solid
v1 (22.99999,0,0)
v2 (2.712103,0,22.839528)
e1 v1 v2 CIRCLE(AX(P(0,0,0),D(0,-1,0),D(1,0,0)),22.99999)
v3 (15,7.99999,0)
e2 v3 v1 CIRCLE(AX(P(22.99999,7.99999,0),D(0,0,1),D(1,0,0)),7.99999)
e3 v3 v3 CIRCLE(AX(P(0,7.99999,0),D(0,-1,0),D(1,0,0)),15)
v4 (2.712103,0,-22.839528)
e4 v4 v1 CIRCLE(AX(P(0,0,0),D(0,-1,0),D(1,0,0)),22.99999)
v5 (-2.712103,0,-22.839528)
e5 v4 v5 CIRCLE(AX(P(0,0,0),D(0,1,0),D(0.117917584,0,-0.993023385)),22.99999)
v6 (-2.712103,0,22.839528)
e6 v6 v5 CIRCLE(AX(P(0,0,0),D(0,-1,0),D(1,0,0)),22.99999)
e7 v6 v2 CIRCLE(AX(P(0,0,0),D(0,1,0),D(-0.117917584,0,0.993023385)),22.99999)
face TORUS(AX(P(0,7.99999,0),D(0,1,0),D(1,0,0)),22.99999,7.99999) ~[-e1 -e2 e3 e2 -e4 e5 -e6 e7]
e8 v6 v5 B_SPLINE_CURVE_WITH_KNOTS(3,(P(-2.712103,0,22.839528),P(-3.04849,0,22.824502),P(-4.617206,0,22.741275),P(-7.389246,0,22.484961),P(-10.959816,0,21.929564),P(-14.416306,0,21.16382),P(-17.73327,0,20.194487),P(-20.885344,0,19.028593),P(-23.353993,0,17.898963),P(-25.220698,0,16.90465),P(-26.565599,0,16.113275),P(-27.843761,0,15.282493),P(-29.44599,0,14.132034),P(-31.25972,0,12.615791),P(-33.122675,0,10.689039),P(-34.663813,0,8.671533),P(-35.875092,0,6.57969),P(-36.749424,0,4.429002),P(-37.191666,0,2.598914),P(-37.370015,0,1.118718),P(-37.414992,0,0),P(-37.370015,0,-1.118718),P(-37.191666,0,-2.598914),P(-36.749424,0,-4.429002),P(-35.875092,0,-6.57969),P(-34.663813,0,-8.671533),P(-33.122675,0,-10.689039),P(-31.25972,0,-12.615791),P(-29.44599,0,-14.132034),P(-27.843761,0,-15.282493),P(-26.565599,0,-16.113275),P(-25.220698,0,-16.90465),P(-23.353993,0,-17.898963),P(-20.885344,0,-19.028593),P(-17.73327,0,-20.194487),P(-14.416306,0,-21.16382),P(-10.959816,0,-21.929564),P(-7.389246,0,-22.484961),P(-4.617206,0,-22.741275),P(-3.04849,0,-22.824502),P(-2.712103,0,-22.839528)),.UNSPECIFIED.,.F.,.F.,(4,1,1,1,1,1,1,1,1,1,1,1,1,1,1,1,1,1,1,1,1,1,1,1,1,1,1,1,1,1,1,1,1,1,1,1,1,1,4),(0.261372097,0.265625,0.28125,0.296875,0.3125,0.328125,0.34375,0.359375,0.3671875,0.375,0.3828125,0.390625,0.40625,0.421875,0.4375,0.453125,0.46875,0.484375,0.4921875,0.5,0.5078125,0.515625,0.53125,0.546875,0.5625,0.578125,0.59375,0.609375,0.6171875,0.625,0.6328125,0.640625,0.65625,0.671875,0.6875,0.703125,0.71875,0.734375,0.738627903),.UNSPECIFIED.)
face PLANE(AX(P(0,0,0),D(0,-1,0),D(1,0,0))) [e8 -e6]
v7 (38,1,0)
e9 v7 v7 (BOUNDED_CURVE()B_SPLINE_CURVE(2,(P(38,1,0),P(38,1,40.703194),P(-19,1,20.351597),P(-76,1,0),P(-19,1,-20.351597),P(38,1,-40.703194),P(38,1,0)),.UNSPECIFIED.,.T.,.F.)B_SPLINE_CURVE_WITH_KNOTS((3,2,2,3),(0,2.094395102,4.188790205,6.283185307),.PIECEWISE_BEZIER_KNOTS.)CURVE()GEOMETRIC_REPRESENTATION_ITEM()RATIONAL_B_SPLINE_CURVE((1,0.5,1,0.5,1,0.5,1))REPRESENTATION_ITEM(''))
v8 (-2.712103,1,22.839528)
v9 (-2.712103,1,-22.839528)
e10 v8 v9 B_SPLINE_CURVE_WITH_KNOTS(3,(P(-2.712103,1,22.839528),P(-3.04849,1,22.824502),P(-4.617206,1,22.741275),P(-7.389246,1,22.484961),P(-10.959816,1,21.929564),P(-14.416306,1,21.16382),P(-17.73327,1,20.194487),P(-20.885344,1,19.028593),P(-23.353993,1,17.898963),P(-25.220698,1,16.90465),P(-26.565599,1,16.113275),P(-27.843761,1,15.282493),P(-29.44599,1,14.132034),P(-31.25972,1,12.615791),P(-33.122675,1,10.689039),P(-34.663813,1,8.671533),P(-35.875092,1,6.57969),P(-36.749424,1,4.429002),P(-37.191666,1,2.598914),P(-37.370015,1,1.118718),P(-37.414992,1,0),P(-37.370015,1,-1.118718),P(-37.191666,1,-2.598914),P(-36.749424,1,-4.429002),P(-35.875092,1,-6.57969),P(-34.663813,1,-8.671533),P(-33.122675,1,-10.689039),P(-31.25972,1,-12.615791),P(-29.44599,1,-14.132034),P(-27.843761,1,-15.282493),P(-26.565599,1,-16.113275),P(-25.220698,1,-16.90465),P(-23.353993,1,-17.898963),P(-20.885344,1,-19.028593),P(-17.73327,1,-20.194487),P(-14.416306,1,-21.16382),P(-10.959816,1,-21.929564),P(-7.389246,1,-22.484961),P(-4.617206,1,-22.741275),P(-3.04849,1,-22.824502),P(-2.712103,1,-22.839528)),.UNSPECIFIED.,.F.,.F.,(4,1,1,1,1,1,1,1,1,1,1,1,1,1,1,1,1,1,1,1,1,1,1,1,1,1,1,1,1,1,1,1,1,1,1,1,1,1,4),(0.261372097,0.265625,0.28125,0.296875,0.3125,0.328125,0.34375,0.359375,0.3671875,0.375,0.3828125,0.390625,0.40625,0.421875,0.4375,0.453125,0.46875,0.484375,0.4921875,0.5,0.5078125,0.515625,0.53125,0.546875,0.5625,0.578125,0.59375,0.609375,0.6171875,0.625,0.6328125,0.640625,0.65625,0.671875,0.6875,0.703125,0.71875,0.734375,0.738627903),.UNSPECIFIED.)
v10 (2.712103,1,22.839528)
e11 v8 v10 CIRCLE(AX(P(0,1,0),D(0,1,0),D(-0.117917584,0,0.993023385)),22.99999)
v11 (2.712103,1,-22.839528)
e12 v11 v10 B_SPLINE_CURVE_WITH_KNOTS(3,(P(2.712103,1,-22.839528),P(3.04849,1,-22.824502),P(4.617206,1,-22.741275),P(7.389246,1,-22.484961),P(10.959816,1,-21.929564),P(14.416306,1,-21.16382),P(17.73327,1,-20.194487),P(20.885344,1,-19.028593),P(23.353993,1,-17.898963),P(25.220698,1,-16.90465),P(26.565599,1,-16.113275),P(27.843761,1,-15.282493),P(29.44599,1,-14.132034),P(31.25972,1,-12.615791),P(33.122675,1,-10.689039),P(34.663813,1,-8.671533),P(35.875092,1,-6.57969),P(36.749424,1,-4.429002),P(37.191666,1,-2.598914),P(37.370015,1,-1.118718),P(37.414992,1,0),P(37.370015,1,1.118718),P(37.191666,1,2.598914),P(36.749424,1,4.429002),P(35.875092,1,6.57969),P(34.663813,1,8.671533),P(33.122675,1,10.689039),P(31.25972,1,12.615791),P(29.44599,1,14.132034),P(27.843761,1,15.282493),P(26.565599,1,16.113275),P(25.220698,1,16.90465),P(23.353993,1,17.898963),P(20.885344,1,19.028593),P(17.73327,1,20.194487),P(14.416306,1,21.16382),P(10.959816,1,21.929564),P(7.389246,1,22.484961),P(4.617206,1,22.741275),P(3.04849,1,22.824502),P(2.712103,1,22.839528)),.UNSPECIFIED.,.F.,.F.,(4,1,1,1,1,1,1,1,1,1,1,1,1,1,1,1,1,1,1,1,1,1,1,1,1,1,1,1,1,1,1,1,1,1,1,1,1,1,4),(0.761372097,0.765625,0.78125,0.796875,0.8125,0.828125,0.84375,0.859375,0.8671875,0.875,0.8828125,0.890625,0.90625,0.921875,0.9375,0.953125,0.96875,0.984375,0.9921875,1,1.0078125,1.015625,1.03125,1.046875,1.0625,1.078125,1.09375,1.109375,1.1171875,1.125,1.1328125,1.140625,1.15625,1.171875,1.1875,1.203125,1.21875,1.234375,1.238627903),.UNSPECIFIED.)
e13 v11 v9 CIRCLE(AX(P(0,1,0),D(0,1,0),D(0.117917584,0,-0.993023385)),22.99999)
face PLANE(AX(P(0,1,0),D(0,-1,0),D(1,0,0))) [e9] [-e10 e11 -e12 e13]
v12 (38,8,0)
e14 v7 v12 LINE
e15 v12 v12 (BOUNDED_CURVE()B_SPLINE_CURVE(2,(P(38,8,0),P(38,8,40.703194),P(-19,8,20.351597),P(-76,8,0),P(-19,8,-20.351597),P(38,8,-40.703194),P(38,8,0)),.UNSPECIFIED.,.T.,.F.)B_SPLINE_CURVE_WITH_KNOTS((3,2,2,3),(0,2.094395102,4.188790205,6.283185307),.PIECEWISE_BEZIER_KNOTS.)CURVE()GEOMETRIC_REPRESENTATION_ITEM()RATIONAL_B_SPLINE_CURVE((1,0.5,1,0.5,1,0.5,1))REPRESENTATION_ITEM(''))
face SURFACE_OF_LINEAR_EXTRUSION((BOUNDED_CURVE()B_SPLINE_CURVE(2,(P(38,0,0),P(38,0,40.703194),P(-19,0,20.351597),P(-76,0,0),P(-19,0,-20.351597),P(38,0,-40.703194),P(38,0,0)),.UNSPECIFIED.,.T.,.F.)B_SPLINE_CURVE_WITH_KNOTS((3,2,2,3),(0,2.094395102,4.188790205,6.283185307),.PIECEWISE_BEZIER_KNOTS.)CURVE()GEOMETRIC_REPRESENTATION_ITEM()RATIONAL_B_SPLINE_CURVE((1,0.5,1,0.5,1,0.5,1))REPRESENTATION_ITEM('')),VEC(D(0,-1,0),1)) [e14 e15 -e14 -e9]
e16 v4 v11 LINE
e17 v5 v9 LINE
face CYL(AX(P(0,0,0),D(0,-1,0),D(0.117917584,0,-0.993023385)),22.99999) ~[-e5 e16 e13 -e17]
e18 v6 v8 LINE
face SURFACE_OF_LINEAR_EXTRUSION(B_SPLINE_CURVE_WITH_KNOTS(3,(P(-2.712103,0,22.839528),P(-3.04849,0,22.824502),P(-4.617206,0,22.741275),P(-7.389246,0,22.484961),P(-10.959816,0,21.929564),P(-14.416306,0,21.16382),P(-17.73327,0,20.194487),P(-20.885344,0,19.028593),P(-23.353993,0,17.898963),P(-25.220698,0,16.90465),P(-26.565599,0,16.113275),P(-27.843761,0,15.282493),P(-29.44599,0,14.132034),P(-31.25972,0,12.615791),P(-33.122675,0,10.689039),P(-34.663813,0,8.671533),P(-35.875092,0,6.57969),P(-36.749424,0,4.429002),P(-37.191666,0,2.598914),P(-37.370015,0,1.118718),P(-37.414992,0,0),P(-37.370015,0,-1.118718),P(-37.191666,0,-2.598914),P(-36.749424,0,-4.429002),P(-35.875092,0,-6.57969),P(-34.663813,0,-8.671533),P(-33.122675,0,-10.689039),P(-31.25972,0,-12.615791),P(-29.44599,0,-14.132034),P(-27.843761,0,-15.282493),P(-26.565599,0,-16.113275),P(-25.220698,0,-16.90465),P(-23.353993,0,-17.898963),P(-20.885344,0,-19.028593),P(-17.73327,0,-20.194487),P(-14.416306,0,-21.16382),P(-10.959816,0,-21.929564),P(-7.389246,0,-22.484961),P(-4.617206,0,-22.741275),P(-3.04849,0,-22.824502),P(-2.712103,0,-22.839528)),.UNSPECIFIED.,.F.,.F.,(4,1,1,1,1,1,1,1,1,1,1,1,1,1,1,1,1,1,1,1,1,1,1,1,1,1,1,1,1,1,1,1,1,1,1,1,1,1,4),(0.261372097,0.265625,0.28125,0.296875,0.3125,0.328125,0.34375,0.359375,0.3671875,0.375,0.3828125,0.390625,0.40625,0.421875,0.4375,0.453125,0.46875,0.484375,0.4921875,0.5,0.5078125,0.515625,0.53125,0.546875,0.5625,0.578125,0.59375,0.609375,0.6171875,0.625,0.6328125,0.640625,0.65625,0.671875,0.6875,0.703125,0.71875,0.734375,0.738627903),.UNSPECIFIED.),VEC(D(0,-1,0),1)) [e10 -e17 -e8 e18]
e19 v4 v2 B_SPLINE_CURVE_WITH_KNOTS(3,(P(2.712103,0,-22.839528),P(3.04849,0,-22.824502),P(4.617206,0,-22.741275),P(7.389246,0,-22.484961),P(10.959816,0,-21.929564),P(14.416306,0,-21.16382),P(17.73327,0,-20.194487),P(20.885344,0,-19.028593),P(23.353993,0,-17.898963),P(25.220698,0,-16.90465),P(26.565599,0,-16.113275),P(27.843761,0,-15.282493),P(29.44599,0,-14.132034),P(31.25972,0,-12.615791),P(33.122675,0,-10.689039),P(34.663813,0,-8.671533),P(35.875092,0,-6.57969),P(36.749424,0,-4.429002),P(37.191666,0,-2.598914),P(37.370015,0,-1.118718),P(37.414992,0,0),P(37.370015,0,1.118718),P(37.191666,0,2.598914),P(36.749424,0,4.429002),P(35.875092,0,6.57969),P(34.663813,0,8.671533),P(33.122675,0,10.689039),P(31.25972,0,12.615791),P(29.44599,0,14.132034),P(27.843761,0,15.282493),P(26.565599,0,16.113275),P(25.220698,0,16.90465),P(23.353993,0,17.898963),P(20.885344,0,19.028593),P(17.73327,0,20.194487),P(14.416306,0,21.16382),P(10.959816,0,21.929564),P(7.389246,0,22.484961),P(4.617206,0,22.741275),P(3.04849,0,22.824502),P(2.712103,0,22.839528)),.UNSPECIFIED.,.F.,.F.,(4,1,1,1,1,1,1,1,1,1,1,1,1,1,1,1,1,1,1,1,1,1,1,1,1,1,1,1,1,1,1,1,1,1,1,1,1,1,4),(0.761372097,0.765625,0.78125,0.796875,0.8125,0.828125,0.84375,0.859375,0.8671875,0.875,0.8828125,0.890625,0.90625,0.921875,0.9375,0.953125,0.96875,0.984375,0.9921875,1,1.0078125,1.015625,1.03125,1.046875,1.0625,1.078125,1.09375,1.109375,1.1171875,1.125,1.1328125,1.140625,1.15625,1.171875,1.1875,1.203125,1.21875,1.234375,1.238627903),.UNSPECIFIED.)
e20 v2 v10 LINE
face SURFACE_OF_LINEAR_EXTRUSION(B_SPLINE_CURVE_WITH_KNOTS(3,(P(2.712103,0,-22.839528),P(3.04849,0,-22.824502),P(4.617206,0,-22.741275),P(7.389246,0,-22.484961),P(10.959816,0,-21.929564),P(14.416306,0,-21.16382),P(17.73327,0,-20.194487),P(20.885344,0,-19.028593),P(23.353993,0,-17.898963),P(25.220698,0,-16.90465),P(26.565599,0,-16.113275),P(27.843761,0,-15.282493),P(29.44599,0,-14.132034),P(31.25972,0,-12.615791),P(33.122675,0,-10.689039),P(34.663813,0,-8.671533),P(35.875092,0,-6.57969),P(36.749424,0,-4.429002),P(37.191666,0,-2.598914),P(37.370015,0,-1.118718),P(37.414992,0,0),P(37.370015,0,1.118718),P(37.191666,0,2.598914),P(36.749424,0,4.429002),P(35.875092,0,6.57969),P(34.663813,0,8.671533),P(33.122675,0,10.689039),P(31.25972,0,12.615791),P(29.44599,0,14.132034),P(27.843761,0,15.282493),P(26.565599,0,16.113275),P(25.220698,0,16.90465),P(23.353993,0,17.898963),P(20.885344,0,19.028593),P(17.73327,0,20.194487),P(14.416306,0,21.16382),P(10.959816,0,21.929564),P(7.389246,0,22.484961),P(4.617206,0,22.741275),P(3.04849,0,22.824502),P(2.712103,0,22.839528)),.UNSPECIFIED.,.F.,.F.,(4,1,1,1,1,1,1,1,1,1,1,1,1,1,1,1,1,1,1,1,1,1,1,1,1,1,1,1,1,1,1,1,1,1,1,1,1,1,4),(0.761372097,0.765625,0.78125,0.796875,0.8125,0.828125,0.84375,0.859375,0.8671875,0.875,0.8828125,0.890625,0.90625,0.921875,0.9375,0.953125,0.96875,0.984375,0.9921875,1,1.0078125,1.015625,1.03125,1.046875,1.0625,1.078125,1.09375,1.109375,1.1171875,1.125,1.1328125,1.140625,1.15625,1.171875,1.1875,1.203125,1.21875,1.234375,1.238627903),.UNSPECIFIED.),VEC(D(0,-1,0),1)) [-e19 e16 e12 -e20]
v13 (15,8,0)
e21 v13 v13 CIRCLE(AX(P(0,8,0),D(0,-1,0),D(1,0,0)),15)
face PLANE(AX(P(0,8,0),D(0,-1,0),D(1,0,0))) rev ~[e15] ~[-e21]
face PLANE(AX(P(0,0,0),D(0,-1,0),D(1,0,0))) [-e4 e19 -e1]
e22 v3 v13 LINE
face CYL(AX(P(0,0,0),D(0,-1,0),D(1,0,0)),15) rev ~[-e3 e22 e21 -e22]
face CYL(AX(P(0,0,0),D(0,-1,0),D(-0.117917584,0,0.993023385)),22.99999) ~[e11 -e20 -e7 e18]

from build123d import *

# Parameters (mm, degrees)
F0_R     = 15
F1_DEPTH = 8
F2_R     = 7.99999
F4_DEPTH = 1


# Not quite as in the source:
# - a fillet or chamfer is up to 0.001 mm smaller than in the source, because OpenCascade refuses the exact size
# - the dataset's text gives a spline's control points without its knots; the knots are read off the source's solid


with BuildPart() as f1:
    # F0 (on Front) → F1 (new body)
    with BuildSketch(Plane.XZ):
        with BuildLine():
            add(Edge.make_bspline(
                [(38, 0), (38, 40.7031939779), (-19, 20.3515969889), (-76, 0), (-19, -20.3515969889), (38, -40.7031939779), (38, 0)],
                knots=[0, 0, 0, 2.0943951024, 2.0943951024, 4.1887902048, 4.1887902048, 6.2831853072, 6.2831853072, 6.2831853072], degree=2, weights=[1, 0.5, 1, 0.5, 1, 0.5, 1]))
        make_face()
        Circle(F0_R, mode=Mode.SUBTRACT)
    extrude(amount=-F1_DEPTH)

    # F2 (radius 8 in the source; OpenCascade refuses exactly that, so slightly less here)
    f2_edges = [f1.edges().sort_by_distance(p)[0] for p in [
        (-15, 0, 0),
    ]]
    fillet(f2_edges, radius=F2_R)

    # F3 (on face) → F4 (cut)
    with BuildSketch(Plane.XZ):
        with BuildLine():
            add(Edge.make_bspline(
                [(38, 0), (38, 40.7031939779), (-19, 20.3515969889), (-76, 0), (-19, -20.3515969889), (38, -40.7031939779), (38, 0)],
                knots=[0, 0, 0, 2.0943951024, 2.0943951024, 4.1887902048, 4.1887902048, 6.2831853072, 6.2831853072, 6.2831853072], degree=2, weights=[1, 0.5, 1, 0.5, 1, 0.5, 1]))
        make_face()
        with BuildLine():
            add(Edge.make_bspline(
                [(37.4, 0), (37.4, 0.3729058543), (37.3700150225, 1.1187175629), (37.1916659495, 2.5989137585), (36.7494239841, 4.429002048), (35.8750924916, 6.5796899728), (34.6638131377, 8.6715326302), (33.1226752034, 10.6890391548), (31.2597201987, 12.6157908188), (29.4459901124, 14.1320344278), (27.8437614939, 15.2824930058), (26.5655992555, 16.1132749708), (25.2206981065, 16.9046504688), (23.3539925194, 17.898962984), (20.885344135, 19.0285928454), (17.7332695204, 20.1944866576), (14.4163055348, 21.1638203846), (10.9598159017, 21.9295641088), (7.38924551, 22.4849605857), (4.6172060854, 22.7412747637), (3.0484899282, 22.8245022324), (2.7121032493, 22.8395279278)],
                knots=[0, 0, 0, 0, 0.0078125, 0.015625, 0.03125, 0.046875, 0.0625, 0.078125, 0.09375, 0.109375, 0.1171875, 0.125, 0.1328125, 0.140625, 0.15625, 0.171875, 0.1875, 0.203125, 0.21875, 0.234375, 0.2386279027, 0.2386279027, 0.2386279027, 0.2386279027], degree=3))
            add(Edge.make_bspline(
                [(2.7121032493, -22.8395279278), (3.0484899282, -22.8245022324), (4.6172060854, -22.7412747637), (7.38924551, -22.4849605857), (10.9598159017, -21.9295641088), (14.4163055348, -21.1638203846), (17.7332695204, -20.1944866576), (20.885344135, -19.0285928454), (23.3539925194, -17.898962984), (25.2206981065, -16.9046504688), (26.5655992555, -16.1132749708), (27.8437614939, -15.2824930058), (29.4459901124, -14.1320344278), (31.2597201987, -12.6157908188), (33.1226752034, -10.6890391548), (34.6638131377, -8.6715326302), (35.8750924916, -6.5796899728), (36.7494239841, -4.429002048), (37.1916659495, -2.5989137585), (37.3700150225, -1.1187175629), (37.4, -0.3729058543), (37.4, 0)],
                knots=[0.7613720973, 0.7613720973, 0.7613720973, 0.7613720973, 0.765625, 0.78125, 0.796875, 0.8125, 0.828125, 0.84375, 0.859375, 0.8671875, 0.875, 0.8828125, 0.890625, 0.90625, 0.921875, 0.9375, 0.953125, 0.96875, 0.984375, 0.9921875, 1, 1, 1, 1], degree=3))
            ThreePointArc((2.7121032493, -22.8395279278), (0, -22.99999), (-2.7121032493, -22.8395279278))
            add(Edge.make_bspline(
                [(-2.7121032493, 22.8395279278), (-3.0484899282, 22.8245022324), (-4.6172060854, 22.7412747637), (-7.38924551, 22.4849605857), (-10.9598159017, 21.9295641088), (-14.4163055348, 21.1638203846), (-17.7332695204, 20.1944866576), (-20.885344135, 19.0285928454), (-23.3539925194, 17.898962984), (-25.2206981065, 16.9046504688), (-26.5655992555, 16.1132749708), (-27.8437614939, 15.2824930058), (-29.4459901124, 14.1320344278), (-31.2597201987, 12.6157908188), (-33.1226752034, 10.6890391548), (-34.6638131377, 8.6715326302), (-35.8750924916, 6.5796899728), (-36.7494239841, 4.429002048), (-37.1916659495, 2.5989137585), (-37.3700150225, 1.1187175629), (-37.4149924887, 0), (-37.3700150225, -1.1187175629), (-37.1916659495, -2.5989137585), (-36.7494239841, -4.429002048), (-35.8750924916, -6.5796899728), (-34.6638131377, -8.6715326302), (-33.1226752034, -10.6890391548), (-31.2597201987, -12.6157908188), (-29.4459901124, -14.1320344278), (-27.8437614939, -15.2824930058), (-26.5655992555, -16.1132749708), (-25.2206981065, -16.9046504688), (-23.3539925194, -17.898962984), (-20.885344135, -19.0285928454), (-17.7332695204, -20.1944866576), (-14.4163055348, -21.1638203846), (-10.9598159017, -21.9295641088), (-7.38924551, -22.4849605857), (-4.6172060854, -22.7412747637), (-3.0484899282, -22.8245022324), (-2.7121032493, -22.8395279278)],
                knots=[0.2613720973, 0.2613720973, 0.2613720973, 0.2613720973, 0.265625, 0.28125, 0.296875, 0.3125, 0.328125, 0.34375, 0.359375, 0.3671875, 0.375, 0.3828125, 0.390625, 0.40625, 0.421875, 0.4375, 0.453125, 0.46875, 0.484375, 0.4921875, 0.5, 0.5078125, 0.515625, 0.53125, 0.546875, 0.5625, 0.578125, 0.59375, 0.609375, 0.6171875, 0.625, 0.6328125, 0.640625, 0.65625, 0.671875, 0.6875, 0.703125, 0.71875, 0.734375, 0.7386279027, 0.7386279027, 0.7386279027, 0.7386279027], degree=3))
            ThreePointArc((-2.7121032493, 22.8395279278), (0, 22.99999), (2.7121032493, 22.8395279278))
        make_face(mode=Mode.SUBTRACT)
    extrude(amount=-F4_DEPTH, mode=Mode.SUBTRACT)


solid = f1.part
